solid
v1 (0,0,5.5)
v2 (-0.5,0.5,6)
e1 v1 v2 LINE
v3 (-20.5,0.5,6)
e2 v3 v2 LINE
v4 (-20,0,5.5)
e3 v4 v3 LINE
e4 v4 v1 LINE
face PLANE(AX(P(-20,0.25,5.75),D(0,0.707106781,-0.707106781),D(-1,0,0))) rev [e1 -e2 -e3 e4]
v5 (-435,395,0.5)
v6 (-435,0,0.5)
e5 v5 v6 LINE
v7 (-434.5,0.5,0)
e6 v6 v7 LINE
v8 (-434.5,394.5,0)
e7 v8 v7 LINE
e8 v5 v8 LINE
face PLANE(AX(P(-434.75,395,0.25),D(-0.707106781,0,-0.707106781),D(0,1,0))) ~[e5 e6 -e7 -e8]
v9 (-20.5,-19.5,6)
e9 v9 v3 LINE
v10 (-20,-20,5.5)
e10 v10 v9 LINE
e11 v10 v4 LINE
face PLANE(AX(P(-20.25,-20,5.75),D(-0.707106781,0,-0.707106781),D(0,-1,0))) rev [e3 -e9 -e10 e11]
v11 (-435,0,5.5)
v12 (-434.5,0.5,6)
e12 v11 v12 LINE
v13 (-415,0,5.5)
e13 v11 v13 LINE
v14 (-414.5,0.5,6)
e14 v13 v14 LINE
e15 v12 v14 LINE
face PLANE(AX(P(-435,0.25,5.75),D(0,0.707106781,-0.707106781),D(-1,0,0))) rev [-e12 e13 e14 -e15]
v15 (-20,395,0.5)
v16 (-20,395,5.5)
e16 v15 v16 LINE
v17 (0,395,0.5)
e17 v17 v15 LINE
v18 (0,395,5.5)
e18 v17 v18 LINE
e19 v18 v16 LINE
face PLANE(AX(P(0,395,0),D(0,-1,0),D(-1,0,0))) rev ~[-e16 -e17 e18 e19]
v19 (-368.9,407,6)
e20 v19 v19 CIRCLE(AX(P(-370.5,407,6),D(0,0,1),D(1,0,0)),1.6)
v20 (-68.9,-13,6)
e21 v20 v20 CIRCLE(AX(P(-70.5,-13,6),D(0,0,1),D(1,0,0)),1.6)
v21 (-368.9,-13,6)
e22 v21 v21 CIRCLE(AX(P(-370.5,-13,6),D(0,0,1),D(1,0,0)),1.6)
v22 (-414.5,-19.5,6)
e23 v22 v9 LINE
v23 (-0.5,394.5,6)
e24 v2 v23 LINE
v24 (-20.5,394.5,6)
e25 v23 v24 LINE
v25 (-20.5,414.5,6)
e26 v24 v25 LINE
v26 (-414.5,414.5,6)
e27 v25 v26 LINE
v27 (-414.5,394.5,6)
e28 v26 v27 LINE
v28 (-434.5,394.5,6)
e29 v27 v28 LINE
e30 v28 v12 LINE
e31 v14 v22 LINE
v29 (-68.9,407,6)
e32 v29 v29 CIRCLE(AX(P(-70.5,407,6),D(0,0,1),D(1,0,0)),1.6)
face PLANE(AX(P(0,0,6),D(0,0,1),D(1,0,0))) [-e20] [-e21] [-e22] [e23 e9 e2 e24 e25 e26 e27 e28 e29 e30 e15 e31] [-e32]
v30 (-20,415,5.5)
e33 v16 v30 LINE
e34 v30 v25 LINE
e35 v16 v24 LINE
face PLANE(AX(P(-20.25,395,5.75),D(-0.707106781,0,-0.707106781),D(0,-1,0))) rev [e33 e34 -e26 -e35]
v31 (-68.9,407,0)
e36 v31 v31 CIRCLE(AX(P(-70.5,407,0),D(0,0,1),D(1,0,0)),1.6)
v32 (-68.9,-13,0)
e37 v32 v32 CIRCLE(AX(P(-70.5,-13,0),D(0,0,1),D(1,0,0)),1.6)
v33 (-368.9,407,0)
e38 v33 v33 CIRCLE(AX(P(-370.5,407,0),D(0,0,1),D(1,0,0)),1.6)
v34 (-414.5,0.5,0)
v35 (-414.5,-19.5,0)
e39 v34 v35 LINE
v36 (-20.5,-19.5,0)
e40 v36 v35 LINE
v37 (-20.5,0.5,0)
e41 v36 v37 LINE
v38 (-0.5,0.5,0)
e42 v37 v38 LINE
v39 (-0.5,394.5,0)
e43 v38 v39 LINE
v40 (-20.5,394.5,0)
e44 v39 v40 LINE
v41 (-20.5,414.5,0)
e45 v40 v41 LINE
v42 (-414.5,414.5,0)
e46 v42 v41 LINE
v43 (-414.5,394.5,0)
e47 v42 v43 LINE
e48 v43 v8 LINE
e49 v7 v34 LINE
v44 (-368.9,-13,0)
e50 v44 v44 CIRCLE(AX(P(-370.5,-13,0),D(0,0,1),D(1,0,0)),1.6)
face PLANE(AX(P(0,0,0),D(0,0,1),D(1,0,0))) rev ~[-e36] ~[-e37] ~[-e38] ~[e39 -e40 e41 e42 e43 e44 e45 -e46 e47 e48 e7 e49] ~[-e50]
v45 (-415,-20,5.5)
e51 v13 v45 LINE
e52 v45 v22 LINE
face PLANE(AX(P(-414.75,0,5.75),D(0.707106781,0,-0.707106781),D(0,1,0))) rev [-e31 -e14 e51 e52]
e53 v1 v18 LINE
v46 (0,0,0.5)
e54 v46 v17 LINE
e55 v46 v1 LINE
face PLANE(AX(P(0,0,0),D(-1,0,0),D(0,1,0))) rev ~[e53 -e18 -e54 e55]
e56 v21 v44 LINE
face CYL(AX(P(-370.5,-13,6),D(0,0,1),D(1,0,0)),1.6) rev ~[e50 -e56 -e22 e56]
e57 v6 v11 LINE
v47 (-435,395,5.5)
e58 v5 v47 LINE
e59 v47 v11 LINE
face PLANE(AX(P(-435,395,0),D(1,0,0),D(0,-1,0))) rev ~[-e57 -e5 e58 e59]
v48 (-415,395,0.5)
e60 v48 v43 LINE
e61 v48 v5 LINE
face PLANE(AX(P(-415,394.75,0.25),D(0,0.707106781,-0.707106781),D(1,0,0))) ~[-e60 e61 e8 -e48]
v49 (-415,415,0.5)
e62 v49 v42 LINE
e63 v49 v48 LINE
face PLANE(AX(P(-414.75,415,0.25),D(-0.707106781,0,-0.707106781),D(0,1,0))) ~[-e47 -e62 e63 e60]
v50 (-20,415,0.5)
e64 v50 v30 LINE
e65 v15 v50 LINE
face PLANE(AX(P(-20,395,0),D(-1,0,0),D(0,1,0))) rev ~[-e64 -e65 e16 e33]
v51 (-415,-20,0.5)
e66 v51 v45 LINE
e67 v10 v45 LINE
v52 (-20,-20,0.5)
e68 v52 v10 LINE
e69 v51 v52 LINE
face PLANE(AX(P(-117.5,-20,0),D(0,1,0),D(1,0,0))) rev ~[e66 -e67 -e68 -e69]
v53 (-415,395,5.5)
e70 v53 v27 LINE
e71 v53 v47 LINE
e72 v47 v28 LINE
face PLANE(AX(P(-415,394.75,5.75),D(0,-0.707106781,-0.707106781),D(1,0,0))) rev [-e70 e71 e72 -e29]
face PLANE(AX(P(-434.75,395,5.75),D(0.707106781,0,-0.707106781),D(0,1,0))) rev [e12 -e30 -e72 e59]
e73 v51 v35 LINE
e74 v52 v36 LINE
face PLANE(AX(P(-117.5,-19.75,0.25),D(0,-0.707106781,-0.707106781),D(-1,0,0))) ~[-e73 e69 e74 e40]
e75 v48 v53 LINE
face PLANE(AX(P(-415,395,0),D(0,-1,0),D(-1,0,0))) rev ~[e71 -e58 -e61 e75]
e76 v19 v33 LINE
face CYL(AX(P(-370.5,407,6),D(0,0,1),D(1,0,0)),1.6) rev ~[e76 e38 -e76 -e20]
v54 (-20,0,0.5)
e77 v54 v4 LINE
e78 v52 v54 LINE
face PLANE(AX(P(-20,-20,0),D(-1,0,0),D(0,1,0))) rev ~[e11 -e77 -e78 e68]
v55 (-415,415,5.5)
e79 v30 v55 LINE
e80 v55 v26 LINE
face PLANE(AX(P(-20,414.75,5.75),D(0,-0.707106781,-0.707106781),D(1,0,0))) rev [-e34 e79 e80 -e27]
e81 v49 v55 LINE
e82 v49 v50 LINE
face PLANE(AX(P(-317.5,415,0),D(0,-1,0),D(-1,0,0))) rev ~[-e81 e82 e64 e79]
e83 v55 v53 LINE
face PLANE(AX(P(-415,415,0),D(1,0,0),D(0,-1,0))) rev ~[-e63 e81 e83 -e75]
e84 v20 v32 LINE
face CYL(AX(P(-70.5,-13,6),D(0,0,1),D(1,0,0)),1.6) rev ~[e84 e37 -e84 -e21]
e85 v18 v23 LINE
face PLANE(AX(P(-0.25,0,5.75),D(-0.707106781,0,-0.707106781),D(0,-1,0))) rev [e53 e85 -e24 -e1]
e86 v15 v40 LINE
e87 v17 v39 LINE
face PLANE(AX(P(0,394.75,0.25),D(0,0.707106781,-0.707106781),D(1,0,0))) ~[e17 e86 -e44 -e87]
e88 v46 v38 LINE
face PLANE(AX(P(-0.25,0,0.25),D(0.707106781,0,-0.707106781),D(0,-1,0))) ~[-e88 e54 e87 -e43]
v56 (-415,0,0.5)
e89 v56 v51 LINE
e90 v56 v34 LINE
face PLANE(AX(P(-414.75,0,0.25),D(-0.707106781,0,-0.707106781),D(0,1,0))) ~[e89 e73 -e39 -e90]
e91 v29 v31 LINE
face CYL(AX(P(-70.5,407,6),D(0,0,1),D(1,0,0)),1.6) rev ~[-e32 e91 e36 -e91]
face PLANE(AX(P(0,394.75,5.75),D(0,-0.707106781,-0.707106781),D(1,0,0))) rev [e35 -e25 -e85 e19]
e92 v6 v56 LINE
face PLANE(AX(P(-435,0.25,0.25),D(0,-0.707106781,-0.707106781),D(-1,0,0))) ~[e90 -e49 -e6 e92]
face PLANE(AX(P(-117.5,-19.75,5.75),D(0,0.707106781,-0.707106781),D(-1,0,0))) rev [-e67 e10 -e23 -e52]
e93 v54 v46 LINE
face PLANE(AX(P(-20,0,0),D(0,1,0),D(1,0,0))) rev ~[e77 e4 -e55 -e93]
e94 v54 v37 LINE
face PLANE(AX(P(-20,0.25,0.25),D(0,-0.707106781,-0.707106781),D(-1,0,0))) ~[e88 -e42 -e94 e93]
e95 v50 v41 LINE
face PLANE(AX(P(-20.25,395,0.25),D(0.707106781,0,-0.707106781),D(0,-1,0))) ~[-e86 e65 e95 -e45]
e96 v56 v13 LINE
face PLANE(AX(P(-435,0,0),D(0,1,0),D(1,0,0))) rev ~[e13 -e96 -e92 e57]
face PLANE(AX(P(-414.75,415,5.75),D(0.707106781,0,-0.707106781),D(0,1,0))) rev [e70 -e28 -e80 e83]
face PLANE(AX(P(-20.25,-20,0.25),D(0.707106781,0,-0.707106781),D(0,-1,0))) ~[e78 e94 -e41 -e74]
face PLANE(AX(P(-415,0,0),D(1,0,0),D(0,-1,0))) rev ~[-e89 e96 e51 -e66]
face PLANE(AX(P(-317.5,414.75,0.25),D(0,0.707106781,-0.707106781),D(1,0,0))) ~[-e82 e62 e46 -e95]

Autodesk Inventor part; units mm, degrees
ref_plane "YZ Plane" through (0, 0, 0) normal (1, 0, 0) x (0, 1, 0)
ref_plane "XZ Plane" through (0, 0, 0) normal (0, 1, 0) x (-1, 0, 0)
ref_plane "XY Plane" through (0, 0, 0) normal (0, 0, 1) x (1, 0, 0)
sketch "Skizze1" plane through (0, 0, 0) normal (0, 0, 1) x (1, 0, 0)
  line L0 (0, 0) -> (0, 395)
  line L1 (0, 395) -> (-20, 395)
  line L2 (-20, 395) -> (-20, 415)
  line L3 (-20, 415) -> (-117.5, 415)
  line L4 (-317.5, 415) -> (-415, 415)
  line L5 (-415, 415) -> (-415, 395)
  line L6 (-415, 395) -> (-435, 395)
  line L7 (-435, 395) -> (-435, 0)
  line L8 (-435, 0) -> (-415, 0)
  line L9 (-415, 0) -> (-415, -20)
  line L10 (-415, 0) -> (-395, 0) construction
  line L11 (-415, -20) -> (-317.5, -20)
  line L12 (-117.5, -20) -> (-20, -20)
  line L13 (-20, -20) -> (-20, 0)
  line L14 (-20, 0) -> (0, 0)
  line L15 (-117.5, 415) -> (-317.5, 415)
  line L16 (-317.5, -20) -> (-117.5, -20)
  dimension "d0" = 395
  dimension "d1" = 20
  dimension "d2" = 20
  dimension "d3" = 97.5
  dimension "d4" = 90
  dimension "d10" = 97.5
  dimension "d11" = 20
  dimension "d12" = 90
  dimension "d13" = 20
  dimension "d14" = 90
  dimension "d15" = 395
  dimension "d17" = 20
  dimension "d18" = 20
  dimension "d19" = 90
  dimension "d40" = 395
extrude "Extrusion1" add sketch "Skizze1" along normal blind 6
chamfer "Fase1" distance 0.5 angle 45 32 edges at (0, 197.5, 6) (-10, 0, 6) (-20, -10, 6) (-68.75, -20, 6) (-217.5, -20, 6) (-366.25, -20, 6) (-415, -10, 6) (-425, 0, 6) (-435, 197.5, 6) (-425, 395, 6) (-415, 405, 6) (-366.25, 415, 6) (-217.5, 415, 6) (-68.75, 415, 6) (-20, 405, 6) (-10, 395, 6) (-425, 0, 0) (-415, -10, 0) (-435, 197.5, 0) (-366.25, -20, 0) (-10, 0, 0) (-20, -10, 0) (-68.75, -20, 0) (-217.5, -20, 0) (-425, 395, 0) (-415, 405, 0) (-366.25, 415, 0) (-217.5, 415, 0) (-68.75, 415, 0) (-20, 405, 0) (-10, 395, 0) (0, 197.5, 0)
sketch "Skizze2" plane through (0, 0, 6) normal (0, 0, 1) x (1, 0, 0)
  circle A0 centre (-70.5, 407) radius 1.6
  line L0 (-414.5, 414.5) -> (-20.5, 414.5) projected
  line L1 (-20.5, 414.5) -> (-20.5, 394.5) projected
  circle A1 centre (-370.5, 407) radius 1.6
  circle A2 centre (-70.5, -13) radius 1.6
  circle A3 centre (-370.5, -13) radius 1.6
  point P0 (0, 0)
  point P1 (-117, 414.5)
  dimension "d27" = 3.2
  dimension "d28" = 7.5
  dimension "d29" = 50
  dimension "d32" = 300
  dimension "d35" = 420
extrude "Extrusion2" cut sketch "Skizze2" against normal through all
properties part number "middle plate" material "Birke"
